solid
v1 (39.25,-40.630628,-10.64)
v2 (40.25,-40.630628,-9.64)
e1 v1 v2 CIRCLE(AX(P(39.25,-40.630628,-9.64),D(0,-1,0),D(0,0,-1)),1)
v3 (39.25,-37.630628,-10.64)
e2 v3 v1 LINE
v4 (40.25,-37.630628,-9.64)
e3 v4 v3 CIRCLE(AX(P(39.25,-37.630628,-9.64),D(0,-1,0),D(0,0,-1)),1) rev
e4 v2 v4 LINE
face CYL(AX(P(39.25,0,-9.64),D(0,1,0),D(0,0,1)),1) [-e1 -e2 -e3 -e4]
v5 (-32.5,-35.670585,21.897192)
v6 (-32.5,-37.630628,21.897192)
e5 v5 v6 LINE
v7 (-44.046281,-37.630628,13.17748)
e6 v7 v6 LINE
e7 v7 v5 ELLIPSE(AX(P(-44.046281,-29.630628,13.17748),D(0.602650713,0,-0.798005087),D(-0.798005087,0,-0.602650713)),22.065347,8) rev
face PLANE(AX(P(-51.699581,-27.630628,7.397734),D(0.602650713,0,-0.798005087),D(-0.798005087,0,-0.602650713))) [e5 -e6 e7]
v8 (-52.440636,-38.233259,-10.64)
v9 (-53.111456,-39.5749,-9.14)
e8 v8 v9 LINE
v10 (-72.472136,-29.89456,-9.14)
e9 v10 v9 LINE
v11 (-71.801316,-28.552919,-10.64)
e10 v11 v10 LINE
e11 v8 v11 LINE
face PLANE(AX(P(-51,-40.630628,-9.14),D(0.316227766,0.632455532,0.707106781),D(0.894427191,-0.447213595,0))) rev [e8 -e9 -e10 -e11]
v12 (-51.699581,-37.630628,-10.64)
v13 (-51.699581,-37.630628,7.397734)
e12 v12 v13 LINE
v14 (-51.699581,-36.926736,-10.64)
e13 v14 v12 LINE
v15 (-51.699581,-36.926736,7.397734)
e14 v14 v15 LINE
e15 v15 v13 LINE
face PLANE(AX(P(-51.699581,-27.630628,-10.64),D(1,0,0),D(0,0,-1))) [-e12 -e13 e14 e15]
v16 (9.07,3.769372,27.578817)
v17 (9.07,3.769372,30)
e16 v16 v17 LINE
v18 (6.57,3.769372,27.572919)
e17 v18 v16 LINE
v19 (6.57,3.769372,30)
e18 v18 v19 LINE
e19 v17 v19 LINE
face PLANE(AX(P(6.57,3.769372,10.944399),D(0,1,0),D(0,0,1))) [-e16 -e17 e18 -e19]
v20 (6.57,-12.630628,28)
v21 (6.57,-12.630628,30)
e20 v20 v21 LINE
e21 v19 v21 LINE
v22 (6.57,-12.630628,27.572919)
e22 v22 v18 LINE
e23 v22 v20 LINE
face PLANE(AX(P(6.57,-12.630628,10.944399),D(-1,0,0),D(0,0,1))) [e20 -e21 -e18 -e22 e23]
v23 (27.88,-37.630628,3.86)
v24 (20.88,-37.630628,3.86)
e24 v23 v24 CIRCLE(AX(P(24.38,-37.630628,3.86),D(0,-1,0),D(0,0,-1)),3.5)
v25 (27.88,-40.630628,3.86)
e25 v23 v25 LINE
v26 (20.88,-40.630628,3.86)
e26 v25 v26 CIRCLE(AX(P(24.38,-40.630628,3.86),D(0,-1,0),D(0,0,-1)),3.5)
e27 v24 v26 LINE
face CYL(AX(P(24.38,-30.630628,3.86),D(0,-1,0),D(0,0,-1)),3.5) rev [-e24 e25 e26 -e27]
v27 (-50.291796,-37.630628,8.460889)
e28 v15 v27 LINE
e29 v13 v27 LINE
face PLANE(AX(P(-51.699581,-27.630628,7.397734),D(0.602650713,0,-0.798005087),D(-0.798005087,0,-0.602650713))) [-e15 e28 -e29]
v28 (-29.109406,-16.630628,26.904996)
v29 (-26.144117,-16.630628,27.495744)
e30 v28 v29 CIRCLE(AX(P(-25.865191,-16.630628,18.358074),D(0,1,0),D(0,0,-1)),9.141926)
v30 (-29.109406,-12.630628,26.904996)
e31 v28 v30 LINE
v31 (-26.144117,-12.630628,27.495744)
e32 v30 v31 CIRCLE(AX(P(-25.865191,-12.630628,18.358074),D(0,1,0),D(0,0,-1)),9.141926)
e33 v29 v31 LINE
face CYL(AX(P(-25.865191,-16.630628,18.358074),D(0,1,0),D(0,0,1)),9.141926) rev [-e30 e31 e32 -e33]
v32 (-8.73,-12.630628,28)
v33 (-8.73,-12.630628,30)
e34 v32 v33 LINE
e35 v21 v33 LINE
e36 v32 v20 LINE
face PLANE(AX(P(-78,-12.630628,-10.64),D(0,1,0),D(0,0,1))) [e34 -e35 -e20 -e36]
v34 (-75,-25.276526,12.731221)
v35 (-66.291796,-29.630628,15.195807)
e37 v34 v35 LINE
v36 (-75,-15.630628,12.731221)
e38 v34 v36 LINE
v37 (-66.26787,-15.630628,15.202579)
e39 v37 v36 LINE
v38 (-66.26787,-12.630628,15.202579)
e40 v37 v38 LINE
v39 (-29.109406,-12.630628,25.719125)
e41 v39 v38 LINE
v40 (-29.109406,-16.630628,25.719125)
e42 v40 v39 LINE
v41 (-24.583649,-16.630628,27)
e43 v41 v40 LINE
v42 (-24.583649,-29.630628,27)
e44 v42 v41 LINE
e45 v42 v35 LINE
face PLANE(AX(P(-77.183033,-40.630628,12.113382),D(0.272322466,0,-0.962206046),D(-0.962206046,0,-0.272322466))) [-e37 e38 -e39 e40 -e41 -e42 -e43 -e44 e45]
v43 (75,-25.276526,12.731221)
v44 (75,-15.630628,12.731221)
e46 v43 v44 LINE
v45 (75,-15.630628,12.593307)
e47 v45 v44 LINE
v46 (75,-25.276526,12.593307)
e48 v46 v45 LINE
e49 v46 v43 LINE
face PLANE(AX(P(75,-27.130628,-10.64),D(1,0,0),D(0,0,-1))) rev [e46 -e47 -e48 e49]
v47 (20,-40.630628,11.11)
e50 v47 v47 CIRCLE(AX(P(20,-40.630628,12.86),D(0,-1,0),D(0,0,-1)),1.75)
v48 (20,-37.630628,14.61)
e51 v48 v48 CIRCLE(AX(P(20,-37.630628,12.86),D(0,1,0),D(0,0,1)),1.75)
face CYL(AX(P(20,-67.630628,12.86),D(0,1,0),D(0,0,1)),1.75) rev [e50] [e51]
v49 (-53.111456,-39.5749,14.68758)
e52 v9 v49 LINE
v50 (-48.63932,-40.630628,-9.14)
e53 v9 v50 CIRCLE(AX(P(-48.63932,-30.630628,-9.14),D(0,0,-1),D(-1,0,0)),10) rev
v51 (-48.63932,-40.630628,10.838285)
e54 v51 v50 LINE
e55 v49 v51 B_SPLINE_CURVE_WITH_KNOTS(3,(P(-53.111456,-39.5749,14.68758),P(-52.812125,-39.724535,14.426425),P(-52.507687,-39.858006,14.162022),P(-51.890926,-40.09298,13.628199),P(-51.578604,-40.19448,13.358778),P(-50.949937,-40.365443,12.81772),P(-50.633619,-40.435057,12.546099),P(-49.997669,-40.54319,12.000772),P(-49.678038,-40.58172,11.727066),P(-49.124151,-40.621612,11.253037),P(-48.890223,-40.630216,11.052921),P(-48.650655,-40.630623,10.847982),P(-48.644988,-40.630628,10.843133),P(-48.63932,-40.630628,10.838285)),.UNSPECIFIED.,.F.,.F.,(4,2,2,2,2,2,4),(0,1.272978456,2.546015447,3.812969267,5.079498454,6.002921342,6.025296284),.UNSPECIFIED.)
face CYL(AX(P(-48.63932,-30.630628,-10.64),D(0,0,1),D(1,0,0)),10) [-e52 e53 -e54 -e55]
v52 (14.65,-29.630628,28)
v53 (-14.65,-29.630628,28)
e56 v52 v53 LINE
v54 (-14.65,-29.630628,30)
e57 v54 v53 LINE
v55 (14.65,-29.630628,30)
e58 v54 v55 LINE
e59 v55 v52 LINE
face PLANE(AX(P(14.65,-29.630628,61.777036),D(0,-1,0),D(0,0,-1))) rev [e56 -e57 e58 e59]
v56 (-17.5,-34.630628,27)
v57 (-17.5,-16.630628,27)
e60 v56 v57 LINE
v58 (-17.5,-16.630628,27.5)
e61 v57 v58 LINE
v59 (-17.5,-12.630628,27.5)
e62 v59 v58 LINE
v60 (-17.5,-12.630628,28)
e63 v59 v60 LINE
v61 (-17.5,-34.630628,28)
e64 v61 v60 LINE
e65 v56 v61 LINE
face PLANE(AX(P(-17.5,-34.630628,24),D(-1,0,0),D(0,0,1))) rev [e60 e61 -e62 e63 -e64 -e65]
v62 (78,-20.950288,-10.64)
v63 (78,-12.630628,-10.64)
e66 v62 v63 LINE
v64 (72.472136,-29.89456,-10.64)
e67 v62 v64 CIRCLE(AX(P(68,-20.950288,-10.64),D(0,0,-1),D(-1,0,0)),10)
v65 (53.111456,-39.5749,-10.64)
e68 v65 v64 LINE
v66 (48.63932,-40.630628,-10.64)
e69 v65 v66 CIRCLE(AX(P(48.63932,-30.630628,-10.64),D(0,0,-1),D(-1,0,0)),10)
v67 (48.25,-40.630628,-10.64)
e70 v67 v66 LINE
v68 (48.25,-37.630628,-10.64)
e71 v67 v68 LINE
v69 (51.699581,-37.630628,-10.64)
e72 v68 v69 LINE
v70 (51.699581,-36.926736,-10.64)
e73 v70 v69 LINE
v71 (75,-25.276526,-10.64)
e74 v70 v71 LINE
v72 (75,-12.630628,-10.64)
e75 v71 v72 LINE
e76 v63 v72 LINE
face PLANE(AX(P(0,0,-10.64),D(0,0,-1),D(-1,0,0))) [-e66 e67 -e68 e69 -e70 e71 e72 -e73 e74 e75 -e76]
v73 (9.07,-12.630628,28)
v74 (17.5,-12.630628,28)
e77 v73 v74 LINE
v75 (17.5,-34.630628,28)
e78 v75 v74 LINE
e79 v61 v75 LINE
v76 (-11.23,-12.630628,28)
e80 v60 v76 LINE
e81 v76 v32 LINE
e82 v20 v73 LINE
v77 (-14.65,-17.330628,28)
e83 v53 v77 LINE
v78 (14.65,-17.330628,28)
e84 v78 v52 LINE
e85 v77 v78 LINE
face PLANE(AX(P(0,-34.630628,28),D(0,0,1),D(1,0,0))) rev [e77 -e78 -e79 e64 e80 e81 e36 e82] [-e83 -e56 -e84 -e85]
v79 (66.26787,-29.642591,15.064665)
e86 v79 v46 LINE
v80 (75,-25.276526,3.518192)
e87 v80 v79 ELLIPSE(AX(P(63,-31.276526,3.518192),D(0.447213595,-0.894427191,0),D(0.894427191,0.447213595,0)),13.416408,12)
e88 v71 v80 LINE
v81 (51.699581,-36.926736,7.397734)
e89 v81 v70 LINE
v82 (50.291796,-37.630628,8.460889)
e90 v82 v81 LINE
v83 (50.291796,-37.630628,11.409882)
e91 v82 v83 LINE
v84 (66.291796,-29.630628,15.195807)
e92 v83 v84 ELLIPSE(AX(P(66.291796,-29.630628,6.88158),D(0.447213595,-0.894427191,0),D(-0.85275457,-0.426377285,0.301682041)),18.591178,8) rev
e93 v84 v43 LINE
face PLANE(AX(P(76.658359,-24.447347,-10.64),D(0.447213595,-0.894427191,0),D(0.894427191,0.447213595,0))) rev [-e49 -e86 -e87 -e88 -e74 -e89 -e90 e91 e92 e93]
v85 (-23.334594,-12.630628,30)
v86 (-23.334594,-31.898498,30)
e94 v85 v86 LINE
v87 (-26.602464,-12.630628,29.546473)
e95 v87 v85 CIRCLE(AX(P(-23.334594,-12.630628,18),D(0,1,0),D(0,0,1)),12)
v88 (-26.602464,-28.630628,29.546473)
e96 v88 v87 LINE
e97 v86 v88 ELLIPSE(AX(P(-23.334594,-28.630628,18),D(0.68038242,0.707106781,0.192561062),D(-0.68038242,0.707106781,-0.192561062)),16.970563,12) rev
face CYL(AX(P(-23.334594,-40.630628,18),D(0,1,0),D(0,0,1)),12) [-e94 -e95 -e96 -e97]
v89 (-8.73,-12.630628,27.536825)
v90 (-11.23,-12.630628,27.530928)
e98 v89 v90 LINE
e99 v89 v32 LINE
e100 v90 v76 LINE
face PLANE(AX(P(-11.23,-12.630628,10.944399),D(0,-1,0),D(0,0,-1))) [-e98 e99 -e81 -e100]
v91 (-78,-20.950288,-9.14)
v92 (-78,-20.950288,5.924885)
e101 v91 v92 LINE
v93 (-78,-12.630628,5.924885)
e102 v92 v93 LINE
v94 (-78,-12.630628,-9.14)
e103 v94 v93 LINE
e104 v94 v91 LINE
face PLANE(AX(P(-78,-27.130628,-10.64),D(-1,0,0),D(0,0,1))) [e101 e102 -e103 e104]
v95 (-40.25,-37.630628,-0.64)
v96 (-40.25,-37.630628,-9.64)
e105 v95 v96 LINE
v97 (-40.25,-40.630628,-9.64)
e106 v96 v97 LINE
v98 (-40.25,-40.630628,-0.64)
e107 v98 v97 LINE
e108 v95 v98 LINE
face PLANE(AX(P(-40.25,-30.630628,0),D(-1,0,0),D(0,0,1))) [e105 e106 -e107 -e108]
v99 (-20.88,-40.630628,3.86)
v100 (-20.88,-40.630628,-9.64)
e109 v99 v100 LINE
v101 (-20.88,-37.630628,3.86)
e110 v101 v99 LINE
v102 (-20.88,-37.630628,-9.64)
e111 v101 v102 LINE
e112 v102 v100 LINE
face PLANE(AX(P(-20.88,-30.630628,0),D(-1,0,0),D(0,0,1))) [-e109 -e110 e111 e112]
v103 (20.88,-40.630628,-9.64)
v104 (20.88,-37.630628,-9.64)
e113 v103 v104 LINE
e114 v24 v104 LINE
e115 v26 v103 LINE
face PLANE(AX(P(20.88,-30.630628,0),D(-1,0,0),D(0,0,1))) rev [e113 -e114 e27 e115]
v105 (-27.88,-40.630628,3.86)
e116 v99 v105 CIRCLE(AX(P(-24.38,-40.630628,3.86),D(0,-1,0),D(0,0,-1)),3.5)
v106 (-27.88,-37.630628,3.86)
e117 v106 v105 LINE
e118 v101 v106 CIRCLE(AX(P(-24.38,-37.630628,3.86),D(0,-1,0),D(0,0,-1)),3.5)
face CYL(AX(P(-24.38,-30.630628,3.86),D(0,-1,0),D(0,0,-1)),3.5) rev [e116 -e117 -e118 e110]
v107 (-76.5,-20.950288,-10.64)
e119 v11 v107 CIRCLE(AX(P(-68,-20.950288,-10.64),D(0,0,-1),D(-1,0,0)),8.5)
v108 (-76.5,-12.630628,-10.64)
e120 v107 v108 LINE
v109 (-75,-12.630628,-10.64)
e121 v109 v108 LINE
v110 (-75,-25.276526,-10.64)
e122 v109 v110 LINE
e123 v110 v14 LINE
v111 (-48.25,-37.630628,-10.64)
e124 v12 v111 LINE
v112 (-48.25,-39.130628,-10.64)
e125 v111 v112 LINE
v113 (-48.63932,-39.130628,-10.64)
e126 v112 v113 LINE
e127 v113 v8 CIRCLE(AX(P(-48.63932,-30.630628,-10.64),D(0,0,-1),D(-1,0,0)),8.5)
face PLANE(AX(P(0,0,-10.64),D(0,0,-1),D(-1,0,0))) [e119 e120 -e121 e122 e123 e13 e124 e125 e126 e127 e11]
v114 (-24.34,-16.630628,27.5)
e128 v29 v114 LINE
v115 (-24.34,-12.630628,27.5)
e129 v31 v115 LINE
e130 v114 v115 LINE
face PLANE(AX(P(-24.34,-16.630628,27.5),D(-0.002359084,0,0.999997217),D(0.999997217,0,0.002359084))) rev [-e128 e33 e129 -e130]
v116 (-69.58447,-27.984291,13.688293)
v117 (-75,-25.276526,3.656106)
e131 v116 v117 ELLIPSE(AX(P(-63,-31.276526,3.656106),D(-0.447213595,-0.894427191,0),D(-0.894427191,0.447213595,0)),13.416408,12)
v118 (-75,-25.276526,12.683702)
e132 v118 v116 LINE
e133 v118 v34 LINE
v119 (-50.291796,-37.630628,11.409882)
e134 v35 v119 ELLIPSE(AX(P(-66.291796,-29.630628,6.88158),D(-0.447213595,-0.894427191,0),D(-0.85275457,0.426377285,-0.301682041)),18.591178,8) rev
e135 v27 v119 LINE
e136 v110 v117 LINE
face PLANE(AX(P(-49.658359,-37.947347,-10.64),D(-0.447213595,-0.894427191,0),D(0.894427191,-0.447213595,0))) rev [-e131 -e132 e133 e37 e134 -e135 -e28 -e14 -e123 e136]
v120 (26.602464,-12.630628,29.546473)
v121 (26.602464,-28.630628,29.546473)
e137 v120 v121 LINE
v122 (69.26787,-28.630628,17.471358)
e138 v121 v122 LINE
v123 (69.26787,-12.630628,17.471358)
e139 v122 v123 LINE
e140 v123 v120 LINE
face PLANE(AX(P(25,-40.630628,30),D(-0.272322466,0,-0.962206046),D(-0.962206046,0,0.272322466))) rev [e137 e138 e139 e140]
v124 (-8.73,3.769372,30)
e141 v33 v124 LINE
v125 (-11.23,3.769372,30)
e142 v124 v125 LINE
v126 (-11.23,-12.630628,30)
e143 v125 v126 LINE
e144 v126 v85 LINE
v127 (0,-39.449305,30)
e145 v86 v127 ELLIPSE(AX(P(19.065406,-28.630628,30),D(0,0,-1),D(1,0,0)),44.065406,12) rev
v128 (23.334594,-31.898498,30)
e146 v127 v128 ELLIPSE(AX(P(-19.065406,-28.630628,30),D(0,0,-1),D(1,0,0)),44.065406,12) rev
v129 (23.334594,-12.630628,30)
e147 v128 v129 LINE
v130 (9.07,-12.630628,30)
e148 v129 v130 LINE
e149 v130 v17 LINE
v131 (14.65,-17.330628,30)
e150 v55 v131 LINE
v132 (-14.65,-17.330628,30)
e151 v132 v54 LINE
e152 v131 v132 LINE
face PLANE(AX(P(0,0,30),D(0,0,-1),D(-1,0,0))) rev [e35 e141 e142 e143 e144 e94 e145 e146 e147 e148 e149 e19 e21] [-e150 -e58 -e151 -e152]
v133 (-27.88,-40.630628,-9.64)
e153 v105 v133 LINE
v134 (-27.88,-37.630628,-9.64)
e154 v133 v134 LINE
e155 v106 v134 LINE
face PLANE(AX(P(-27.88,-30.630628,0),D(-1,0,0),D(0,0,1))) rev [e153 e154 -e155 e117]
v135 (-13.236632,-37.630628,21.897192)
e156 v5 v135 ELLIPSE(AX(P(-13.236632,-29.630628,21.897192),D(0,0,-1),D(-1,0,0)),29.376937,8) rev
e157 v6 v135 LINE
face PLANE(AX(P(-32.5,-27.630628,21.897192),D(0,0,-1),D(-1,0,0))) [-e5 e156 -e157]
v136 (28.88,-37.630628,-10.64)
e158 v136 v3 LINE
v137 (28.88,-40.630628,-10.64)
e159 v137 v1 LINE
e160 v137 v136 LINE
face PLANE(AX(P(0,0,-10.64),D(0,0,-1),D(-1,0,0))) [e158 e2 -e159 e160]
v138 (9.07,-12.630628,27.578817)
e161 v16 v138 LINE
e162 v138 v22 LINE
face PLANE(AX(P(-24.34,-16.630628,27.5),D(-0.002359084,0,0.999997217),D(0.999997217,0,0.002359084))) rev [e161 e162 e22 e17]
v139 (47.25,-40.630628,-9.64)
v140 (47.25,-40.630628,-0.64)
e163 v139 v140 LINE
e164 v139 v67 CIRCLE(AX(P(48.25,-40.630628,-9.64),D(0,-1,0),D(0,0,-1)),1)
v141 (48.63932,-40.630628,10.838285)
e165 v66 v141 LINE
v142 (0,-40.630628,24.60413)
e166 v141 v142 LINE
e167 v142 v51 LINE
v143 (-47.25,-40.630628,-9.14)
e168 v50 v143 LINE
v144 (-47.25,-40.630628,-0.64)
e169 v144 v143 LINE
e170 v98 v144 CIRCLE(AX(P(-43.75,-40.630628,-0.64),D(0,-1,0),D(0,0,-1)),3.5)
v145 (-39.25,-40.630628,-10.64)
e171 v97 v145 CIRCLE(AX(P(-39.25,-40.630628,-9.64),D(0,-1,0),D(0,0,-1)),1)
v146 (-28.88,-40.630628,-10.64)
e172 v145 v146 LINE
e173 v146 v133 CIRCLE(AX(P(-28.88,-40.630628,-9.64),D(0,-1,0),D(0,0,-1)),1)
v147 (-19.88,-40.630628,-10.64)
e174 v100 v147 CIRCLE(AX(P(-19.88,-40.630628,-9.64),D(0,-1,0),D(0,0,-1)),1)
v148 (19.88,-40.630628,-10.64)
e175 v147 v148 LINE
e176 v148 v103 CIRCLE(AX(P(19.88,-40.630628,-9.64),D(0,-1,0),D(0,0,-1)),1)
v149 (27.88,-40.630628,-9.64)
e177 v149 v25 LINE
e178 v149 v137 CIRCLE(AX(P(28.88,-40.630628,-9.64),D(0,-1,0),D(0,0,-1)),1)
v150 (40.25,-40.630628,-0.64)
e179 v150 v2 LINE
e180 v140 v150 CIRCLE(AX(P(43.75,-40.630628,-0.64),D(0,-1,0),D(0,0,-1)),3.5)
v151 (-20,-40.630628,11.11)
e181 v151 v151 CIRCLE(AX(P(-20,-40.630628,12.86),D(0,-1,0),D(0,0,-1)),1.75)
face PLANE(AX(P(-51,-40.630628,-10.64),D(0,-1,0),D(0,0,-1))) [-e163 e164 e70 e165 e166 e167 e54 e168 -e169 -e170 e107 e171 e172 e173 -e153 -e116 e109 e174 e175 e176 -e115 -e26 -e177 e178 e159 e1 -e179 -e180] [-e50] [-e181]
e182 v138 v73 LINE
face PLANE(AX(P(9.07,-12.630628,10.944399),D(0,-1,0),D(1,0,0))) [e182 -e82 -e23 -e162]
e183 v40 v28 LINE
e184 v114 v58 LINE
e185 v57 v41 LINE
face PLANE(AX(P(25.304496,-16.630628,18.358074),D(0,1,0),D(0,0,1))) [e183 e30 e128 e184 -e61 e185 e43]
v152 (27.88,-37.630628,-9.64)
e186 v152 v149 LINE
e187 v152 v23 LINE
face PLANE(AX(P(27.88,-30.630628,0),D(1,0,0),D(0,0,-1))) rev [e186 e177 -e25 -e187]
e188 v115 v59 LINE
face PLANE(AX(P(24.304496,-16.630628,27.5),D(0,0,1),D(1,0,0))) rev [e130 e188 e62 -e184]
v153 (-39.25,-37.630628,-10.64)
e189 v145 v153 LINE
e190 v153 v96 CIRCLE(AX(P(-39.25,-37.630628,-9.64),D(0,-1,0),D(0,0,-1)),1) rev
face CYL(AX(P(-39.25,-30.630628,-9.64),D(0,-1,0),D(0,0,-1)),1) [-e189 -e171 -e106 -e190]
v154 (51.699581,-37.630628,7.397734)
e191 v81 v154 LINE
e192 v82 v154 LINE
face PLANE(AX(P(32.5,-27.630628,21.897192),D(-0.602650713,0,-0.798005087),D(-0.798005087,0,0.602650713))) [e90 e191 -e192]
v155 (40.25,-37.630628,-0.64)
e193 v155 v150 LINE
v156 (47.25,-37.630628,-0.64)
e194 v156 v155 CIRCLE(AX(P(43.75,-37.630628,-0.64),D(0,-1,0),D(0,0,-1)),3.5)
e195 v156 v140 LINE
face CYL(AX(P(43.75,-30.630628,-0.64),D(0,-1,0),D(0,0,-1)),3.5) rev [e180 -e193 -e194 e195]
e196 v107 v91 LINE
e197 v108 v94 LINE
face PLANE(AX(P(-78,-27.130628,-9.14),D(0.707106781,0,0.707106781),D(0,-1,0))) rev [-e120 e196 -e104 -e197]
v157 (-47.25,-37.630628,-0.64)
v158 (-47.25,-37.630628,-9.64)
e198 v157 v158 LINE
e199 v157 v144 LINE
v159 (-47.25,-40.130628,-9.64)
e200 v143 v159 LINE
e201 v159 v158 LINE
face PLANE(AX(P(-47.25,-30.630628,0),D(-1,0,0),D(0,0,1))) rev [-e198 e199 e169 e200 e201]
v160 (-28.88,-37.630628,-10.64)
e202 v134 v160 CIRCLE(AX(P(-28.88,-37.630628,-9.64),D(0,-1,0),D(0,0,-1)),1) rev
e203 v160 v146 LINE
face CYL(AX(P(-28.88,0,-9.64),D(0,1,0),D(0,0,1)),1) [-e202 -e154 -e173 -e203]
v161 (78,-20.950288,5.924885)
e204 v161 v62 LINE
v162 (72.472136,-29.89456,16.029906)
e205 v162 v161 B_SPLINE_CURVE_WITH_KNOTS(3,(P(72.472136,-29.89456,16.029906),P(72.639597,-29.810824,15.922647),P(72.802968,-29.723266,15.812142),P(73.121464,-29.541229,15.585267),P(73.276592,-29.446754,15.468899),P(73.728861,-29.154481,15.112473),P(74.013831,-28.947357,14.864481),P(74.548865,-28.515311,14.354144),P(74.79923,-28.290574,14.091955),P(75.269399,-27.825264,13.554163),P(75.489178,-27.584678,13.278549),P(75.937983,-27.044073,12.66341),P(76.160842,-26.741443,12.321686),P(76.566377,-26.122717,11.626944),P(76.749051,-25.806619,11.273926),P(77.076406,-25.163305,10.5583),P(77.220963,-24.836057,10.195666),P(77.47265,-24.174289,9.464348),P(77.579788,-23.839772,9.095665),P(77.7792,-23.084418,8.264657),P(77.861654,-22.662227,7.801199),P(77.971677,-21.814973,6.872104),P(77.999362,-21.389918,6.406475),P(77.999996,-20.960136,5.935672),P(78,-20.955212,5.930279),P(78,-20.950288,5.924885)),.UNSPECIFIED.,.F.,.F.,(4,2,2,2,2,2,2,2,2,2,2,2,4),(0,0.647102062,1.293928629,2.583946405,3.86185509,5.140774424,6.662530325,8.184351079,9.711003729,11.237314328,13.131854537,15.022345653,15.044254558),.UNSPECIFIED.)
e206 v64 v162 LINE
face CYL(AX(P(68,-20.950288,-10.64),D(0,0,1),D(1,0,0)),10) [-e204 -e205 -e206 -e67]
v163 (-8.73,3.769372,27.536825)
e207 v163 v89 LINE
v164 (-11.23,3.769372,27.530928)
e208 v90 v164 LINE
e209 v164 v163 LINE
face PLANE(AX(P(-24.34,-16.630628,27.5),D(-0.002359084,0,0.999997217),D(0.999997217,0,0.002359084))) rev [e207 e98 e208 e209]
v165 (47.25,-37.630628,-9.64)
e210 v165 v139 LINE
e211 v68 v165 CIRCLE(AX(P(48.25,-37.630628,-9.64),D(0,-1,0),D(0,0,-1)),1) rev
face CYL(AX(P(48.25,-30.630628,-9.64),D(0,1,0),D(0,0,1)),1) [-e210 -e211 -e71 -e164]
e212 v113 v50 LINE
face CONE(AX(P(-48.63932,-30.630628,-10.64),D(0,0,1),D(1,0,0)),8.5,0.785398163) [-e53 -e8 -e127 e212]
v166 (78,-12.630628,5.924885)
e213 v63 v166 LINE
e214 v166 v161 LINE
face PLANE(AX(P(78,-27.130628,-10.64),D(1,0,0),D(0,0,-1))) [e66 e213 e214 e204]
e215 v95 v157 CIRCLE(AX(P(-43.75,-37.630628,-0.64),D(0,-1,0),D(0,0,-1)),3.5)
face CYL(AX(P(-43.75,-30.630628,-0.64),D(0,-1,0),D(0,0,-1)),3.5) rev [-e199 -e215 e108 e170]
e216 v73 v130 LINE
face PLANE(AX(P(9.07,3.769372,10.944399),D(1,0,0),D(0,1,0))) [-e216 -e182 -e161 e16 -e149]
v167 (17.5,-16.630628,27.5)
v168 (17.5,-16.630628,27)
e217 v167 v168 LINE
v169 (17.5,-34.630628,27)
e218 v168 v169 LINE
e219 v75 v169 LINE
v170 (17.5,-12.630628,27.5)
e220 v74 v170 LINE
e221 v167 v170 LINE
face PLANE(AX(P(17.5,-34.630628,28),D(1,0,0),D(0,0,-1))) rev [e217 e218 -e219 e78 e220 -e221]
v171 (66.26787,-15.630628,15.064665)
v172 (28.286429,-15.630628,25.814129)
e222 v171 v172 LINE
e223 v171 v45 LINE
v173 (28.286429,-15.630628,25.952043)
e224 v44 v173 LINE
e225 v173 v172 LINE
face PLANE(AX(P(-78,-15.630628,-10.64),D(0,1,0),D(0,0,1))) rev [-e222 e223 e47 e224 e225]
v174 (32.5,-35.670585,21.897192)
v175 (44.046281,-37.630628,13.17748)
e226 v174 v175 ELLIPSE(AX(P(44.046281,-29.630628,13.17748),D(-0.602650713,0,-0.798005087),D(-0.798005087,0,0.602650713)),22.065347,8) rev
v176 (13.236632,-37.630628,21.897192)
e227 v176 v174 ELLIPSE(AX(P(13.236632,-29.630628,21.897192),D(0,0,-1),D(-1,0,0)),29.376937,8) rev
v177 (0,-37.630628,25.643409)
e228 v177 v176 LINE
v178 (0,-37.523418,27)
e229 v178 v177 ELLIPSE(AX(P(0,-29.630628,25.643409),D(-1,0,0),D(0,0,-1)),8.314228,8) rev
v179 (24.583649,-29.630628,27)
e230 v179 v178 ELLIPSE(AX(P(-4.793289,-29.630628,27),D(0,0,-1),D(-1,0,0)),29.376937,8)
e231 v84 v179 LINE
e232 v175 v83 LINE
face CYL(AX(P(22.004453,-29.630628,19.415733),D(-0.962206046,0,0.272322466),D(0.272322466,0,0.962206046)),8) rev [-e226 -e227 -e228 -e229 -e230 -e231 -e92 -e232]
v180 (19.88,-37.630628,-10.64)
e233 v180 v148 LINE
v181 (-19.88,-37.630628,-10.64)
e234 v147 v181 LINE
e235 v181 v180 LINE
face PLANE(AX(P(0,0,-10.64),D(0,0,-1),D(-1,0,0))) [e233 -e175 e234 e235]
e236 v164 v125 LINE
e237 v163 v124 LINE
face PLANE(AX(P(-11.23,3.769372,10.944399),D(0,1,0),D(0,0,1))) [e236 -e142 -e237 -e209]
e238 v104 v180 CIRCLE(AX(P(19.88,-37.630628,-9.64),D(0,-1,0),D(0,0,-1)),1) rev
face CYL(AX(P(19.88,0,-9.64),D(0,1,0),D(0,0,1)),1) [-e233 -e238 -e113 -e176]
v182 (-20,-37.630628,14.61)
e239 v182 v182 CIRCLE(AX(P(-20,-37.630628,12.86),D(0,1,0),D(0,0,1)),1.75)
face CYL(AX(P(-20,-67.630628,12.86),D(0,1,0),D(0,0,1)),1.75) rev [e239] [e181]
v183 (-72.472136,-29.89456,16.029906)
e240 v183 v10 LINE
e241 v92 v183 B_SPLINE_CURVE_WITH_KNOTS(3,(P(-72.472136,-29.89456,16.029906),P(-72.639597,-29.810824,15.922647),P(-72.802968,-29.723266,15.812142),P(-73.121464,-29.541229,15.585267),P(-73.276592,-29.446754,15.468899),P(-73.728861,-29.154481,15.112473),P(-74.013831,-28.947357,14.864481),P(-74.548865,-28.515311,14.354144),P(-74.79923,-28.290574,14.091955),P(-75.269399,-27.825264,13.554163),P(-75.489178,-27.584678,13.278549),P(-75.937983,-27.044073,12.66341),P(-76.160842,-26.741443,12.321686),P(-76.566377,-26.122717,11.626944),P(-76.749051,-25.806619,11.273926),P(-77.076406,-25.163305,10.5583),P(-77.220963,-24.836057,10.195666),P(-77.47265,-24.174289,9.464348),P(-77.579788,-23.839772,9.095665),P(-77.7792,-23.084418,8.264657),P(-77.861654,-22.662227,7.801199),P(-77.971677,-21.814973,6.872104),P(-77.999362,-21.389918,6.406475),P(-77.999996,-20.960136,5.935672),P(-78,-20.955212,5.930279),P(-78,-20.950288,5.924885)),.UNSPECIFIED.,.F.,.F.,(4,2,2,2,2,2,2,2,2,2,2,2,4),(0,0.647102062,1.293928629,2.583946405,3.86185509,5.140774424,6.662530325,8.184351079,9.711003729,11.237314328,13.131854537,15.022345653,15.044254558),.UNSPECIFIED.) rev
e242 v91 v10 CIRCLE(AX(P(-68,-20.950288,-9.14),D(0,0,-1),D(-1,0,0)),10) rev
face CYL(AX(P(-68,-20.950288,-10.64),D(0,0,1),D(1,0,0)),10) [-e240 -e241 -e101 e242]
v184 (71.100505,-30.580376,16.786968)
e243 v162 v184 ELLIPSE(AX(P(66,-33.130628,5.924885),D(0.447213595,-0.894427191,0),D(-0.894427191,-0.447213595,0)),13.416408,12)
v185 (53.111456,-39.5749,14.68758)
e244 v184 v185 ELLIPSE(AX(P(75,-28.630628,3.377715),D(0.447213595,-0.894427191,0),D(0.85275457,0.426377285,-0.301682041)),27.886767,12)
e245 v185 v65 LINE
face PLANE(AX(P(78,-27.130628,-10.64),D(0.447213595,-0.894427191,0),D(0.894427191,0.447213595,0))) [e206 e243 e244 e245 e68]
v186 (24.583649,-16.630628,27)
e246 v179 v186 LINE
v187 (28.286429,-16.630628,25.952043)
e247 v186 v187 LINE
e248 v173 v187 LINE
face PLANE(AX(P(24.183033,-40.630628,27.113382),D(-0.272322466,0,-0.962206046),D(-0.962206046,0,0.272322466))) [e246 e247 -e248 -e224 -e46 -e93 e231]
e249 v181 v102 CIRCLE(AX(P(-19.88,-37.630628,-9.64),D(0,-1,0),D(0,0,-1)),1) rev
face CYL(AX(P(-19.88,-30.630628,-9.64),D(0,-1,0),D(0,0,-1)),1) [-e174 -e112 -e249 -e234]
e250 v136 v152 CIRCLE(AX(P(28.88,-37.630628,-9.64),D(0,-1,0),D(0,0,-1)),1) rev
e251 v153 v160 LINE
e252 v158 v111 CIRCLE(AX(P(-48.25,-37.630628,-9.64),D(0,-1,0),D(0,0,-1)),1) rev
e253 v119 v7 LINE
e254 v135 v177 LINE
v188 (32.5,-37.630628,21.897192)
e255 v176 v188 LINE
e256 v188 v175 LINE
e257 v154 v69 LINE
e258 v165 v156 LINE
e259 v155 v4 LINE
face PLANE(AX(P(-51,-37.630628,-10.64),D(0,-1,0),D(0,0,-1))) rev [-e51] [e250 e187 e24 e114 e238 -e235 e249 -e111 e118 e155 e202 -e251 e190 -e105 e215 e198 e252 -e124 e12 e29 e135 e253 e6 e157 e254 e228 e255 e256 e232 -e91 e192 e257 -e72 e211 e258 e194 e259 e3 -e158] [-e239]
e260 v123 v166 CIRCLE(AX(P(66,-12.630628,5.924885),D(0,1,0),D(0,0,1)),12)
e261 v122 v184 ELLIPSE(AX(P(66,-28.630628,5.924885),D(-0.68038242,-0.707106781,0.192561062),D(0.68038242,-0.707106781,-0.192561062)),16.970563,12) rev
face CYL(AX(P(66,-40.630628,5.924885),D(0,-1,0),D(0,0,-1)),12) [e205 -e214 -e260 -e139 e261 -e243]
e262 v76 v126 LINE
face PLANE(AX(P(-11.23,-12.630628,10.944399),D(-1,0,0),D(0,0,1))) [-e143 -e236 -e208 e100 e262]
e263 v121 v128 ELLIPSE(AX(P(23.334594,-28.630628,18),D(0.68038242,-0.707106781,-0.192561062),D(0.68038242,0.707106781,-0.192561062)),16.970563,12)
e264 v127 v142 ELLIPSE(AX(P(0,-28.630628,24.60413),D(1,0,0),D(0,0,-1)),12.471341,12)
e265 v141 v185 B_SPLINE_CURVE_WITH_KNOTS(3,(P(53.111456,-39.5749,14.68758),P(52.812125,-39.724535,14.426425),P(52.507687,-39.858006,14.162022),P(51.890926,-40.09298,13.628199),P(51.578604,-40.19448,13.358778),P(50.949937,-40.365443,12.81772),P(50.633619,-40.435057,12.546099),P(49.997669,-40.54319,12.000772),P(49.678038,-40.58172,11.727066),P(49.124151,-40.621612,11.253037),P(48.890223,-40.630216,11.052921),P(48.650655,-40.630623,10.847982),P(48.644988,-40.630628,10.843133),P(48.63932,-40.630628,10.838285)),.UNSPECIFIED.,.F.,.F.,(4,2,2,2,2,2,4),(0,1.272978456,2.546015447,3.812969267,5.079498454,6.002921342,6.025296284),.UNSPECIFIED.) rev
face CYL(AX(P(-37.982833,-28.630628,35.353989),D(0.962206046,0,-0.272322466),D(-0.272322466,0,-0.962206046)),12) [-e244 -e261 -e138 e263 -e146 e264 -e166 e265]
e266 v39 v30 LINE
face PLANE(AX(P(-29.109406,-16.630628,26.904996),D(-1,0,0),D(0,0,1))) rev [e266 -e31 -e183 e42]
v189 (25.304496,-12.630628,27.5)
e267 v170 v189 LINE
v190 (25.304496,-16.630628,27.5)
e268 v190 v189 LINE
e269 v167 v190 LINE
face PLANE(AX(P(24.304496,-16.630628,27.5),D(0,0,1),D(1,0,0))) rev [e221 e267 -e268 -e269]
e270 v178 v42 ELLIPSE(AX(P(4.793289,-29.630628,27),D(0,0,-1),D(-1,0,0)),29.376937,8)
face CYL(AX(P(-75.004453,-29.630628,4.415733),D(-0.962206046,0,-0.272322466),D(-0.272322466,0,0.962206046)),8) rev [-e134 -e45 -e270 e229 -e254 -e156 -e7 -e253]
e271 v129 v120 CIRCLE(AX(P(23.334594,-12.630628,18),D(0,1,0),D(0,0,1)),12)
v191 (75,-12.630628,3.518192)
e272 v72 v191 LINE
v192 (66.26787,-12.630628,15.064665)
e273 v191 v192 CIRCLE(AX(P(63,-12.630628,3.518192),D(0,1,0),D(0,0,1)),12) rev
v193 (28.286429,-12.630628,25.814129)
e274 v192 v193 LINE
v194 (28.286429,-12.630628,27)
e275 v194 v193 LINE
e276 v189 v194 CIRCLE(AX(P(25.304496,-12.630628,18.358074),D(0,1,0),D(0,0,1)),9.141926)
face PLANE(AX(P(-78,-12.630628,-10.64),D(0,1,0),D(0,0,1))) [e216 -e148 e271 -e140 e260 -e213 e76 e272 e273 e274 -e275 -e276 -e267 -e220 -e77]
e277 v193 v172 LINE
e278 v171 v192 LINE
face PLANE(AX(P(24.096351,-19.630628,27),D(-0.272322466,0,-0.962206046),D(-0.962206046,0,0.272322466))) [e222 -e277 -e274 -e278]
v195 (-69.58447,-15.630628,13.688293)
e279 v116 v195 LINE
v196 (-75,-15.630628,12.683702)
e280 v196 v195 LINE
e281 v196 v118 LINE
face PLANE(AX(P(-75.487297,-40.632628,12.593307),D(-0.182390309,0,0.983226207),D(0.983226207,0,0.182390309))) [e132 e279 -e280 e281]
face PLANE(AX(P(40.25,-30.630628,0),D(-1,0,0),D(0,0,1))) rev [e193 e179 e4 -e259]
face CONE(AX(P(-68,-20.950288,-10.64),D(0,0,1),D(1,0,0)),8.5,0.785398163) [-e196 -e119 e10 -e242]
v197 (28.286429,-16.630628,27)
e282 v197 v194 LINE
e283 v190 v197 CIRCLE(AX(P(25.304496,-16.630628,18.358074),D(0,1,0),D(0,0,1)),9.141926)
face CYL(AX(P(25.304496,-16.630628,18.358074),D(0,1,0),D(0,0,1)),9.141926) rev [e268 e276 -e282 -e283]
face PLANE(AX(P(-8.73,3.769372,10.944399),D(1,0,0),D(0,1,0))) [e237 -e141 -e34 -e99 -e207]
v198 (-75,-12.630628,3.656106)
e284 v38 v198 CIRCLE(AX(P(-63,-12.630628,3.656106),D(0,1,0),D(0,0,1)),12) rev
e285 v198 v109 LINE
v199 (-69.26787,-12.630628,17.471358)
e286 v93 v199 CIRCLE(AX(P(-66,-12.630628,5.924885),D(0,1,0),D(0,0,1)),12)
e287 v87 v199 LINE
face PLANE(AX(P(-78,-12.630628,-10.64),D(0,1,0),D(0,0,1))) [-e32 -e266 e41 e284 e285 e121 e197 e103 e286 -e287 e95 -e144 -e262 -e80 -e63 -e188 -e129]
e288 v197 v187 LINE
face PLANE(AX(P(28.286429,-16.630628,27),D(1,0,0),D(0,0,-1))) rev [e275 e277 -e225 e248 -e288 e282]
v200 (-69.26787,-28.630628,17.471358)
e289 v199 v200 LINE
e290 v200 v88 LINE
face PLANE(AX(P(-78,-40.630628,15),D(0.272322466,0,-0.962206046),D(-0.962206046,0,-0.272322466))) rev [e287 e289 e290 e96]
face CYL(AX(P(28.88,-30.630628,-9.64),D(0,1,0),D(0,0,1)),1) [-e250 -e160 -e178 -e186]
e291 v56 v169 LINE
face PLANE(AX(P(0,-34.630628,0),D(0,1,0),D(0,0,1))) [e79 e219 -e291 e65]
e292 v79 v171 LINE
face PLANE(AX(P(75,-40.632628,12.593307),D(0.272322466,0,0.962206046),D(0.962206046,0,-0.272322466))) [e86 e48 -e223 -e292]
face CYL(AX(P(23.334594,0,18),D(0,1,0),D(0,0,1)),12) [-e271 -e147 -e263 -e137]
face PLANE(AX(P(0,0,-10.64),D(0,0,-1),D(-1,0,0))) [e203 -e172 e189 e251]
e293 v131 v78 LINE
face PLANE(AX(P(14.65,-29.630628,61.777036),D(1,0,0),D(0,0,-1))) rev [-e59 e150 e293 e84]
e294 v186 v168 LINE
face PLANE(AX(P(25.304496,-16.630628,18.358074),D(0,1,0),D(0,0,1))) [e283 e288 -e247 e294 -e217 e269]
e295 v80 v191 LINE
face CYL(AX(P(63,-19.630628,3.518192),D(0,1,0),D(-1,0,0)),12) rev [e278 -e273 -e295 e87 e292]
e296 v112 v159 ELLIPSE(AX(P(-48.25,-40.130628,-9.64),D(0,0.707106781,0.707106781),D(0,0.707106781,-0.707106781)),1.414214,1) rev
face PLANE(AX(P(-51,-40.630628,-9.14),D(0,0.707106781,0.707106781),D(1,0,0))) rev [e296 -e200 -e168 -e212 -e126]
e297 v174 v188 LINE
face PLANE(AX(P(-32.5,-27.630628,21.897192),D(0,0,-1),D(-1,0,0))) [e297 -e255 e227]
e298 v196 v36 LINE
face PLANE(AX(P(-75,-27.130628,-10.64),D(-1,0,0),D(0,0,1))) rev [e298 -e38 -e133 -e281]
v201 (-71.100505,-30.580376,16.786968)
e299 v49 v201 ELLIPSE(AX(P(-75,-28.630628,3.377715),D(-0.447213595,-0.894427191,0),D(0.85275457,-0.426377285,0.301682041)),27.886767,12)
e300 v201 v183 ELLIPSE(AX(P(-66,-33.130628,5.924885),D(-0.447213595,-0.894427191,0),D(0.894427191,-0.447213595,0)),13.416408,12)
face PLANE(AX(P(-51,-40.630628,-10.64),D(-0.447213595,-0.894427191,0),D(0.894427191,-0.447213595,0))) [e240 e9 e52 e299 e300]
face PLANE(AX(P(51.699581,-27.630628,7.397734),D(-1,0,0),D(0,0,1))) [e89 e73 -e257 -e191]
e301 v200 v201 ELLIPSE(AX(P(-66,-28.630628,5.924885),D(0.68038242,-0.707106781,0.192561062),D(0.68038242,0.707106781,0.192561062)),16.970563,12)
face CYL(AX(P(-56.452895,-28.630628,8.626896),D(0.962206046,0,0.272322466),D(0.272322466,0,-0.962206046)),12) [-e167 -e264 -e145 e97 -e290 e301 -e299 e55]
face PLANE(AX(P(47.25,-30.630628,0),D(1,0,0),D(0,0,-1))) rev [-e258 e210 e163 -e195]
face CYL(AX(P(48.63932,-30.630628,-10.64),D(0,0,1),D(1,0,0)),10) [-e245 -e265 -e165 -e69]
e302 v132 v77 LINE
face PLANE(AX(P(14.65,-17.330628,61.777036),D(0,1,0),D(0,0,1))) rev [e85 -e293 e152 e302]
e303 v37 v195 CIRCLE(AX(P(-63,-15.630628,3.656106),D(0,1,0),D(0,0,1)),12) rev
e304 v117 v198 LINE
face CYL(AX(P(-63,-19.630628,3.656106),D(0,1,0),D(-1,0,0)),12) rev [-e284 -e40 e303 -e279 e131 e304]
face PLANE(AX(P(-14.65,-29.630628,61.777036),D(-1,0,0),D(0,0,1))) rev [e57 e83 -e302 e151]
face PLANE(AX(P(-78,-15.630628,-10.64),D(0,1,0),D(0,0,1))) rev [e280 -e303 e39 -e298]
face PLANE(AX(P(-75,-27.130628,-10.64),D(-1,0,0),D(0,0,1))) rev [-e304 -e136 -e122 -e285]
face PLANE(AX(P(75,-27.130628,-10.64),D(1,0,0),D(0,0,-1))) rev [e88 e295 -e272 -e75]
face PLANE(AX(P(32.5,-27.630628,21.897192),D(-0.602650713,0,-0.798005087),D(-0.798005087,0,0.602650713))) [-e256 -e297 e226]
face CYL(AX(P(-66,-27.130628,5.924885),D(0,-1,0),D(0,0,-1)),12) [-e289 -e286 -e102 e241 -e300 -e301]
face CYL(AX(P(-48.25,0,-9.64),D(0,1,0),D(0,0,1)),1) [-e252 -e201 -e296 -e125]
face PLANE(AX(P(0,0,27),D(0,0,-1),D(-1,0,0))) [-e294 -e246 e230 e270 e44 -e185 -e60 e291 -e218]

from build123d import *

# Parameters (mm, degrees)
BOSS_EXTRUDE1_DEPTH      = 30
BOSS_EXTRUDE1_DEPTH_BACK = 10.64
CUT_EXTRUDE1_DEPTH       = 89.136258146
SHELL1_T                 = -3
CUT_EXTRUDE4_DEPTH       = 4
CUT_EXTRUDE4_DEPTH_BACK  = 10
FILLET3_R                = 8
FILLET1_R                = 12
SKETCH4_R                = 1.75
CUT_EXTRUDE2_DEPTH       = 30
BOSS_EXTRUDE5_REACH      = 89.23
CUT_EXTRUDE5_DEPTH       = 4
SKETCH12_W               = 29.3
SKETCH12_H               = 12.3
CUT_EXTRUDE6_DEPTH       = 3
CUT_EXTRUDE7_DEPTH       = 22
FILLET2_START            = -12
FILLET2_DEPTH            = 29.471357663
BOSS_EXTRUDE4_REACH      = 98.884
SKETCH14_W               = 2.5
SKETCH14_H               = 16.4
SKETCH18_R               = 3.5
CUT_EXTRUDE11_DEPTH      = 10
CUT_EXTRUDE12_DEPTH      = 10
CHAMFER1_SIZE            = 1.5
FILLET5_R                = 1


with BuildPart() as part:
    # Sketch1 → Boss-Extrude1 (new, two sides: drawn at the far end of the back side and taken through both)
    with BuildSketch(Plane.XY.offset(-BOSS_EXTRUDE1_DEPTH_BACK)):
        Polygon((-51, -40.630628171), (51, -40.630628171), (78, -27.130628171), (78, -12.630628171), (-78, -12.630628171), (-78, -27.130628171), align=None)
    extrude(amount=BOSS_EXTRUDE1_DEPTH + BOSS_EXTRUDE1_DEPTH_BACK)

    # Sketch2 → Cut-Extrude1 (cut, through all)
    with BuildSketch(Plane(origin=(0, -12.630628171, 0), x_dir=(1, 0, 0), z_dir=(0, 1, 0))):
        Polygon((-78, -15), (-25, -30), (25, -30), (78, -15), (78, -44.649515781), (-78, -44.649515781), align=None)
    extrude(amount=-CUT_EXTRUDE1_DEPTH, mode=Mode.SUBTRACT)

    # Shell1
    shell1_openings = [part.faces().sort_by_distance(p)[0] for p in [
        (0, -25.765697486, -10.64),
    ]]
    offset(amount=SHELL1_T, openings=shell1_openings, kind=Kind.INTERSECTION)

    # Sketch7 → Cut-Extrude4 (cut, two sides: drawn at the far end of the back side and taken through both)
    with BuildSketch(Plane.XZ.offset(15.630628171).offset(-CUT_EXTRUDE4_DEPTH_BACK)):
        with BuildLine():
            Line((-24.583648517, 27), (24.096351483, 27))
            Line((24.096351483, 27), (66.26786959, 15.064664687))
            ThreePointArc((66.26786959, 15.064664687), (72.571165945, 10.756478016), (75, 3.518192137))
            Line((75, 3.518192137), (75, -10.64))
            Line((75, -10.64), (-75, -10.64))
            Line((-75, -10.64), (-75, 3.656106392))
            ThreePointArc((-75, 3.656106392), (-72.571165945, 10.894392271), (-66.26786959, 15.202578942))
            Line((-66.26786959, 15.202578942), (-24.583648517, 27))
        make_face()
    extrude(amount=CUT_EXTRUDE4_DEPTH + CUT_EXTRUDE4_DEPTH_BACK, mode=Mode.SUBTRACT)

    # Fillet3
    # the kernel refuses this fillet: 8 mm, written as the material it adds along each edge
    with BuildSketch(Plane(origin=(-69.535916984, -37.630628171, 14.277659868), x_dir=(0.27232246579934893, 0, -0.9622060458243663), z_dir=(0.9622060458243663, 0, 0.27232246579934893))) as fillet3_piece_1_section:
        with BuildLine():
            CenterArc((FILLET3_R, FILLET3_R), FILLET3_R, 180, 90)
            Line((0, FILLET3_R), (0, 0))
            Line((0, 0), (FILLET3_R, 0))
        make_face()
    fillet3_piece_1 = extrude(amount=80.717923528, mode=Mode.PRIVATE)
    fillet3_piece_1 = split(fillet3_piece_1, bisect_by=Plane(origin=(-65.687092801, -29.932979805, 14.277659868), z_dir=(0.44721359549995787, 0.894427190999916, 0)), keep=Keep.TOP, mode=Mode.PRIVATE)
    fillet3_piece_1 = split(fillet3_piece_1, bisect_by=Plane(origin=(-69.535916984, -37.630628171, 27), z_dir=(0, 0, -1)), keep=Keep.TOP, mode=Mode.PRIVATE)
    add(fillet3_piece_1)
    with BuildSketch(Plane(origin=(-8.131357041, -37.630628171, 36.258963837), x_dir=(-0.27232246579934893, 0, -0.9622060458243663), z_dir=(0.9622060458243663, 0, -0.27232246579934893))) as fillet3_piece_2_section:
        with BuildLine():
            CenterArc((FILLET3_R, FILLET3_R), FILLET3_R, 180, 90)
            Line((0, FILLET3_R), (0, 0))
            Line((0, 0), (FILLET3_R, 0))
        make_face()
    fillet3_piece_2 = extrude(amount=80.717923528, mode=Mode.PRIVATE)
    fillet3_piece_2 = split(fillet3_piece_2, bisect_by=Plane(origin=(3.553273581, -60.999889415, 36.258963837), z_dir=(-0.44721359549995787, 0.894427190999916, 0)), keep=Keep.TOP, mode=Mode.PRIVATE)
    fillet3_piece_2 = split(fillet3_piece_2, bisect_by=Plane(origin=(-8.131357041, -37.630628171, 27), z_dir=(0, 0, -1)), keep=Keep.TOP, mode=Mode.PRIVATE)
    add(fillet3_piece_2)

    # Fillet1
    # the kernel refuses this fillet: 12 mm, written as the material it takes off along each edge
    with BuildSketch(Plane(origin=(78, 10.057159045, 15), x_dir=(-0.9622060458243663, 0, 0.2723224657993491), z_dir=(0, -1, 0)), Plane(origin=(-78, 10.057159045, 15), x_dir=(0, 0, -1), z_dir=(0, -1, 0))) as fillet1_piece_1:
        with BuildLine():
            CenterArc((FILLET1_R * 0.756259573881, FILLET1_R), FILLET1_R, 195.802513954, 74.197486046)
            Line((-FILLET1_R * 0.205946471944, FILLET1_R * 0.727677534201), (0, 0))
            Line((0, 0), (FILLET1_R * 0.756259573881, 0))
        make_face()
    extrude(amount=59.875574433, mode=Mode.SUBTRACT)
    with BuildSketch(Plane(origin=(25, -8.46711334, 30), x_dir=(0.9622060458243658, 0, -0.27232246579935065), z_dir=(0, -1, 0))) as fillet1_piece_2:
        with BuildLine():
            CenterArc((FILLET1_R * 0.138783827712, -FILLET1_R), FILLET1_R, 90, 15.802513954)
            Line((-FILLET1_R * 0.133538638087, -FILLET1_R * 0.0377939541756), (0, 0))
            Line((0, 0), (FILLET1_R * 0.138783827712, 0))
        make_face()
    extrude(amount=36.327029663, mode=Mode.SUBTRACT)
    with BuildSketch(Plane(origin=(-24.072508337, -40.630628171, 43.888445756), x_dir=(0, 1, 0), z_dir=(0.9622060458243663, 0, -0.27232246579934893)), Plane(origin=(-79.866181375, -40.630628171, 14.47183546), x_dir=(0, 1, 0), z_dir=(0.9622060458243663, 0, 0.27232246579934893))) as fillet1_piece_3:
        with BuildLine():
            CenterArc((FILLET1_R, -FILLET1_R), FILLET1_R, 90, 90)
            Line((0, -FILLET1_R), (0, 0))
            Line((0, 0), (FILLET1_R, 0))
        make_face()
    extrude(amount=108.021239487, mode=Mode.SUBTRACT)
    with BuildSketch(Plane(origin=(-25, -8.46711334, 30), x_dir=(-0.9622060458243663, 0, -0.272322465799349), z_dir=(0, -1, 0))) as fillet1_piece_4:
        with BuildLine():
            CenterArc((FILLET1_R * 0.138783827712, FILLET1_R), FILLET1_R, 254.197486046, 15.802513954)
            Line((-FILLET1_R * 0.133538638087, FILLET1_R * 0.0377939541756), (0, 0))
            Line((0, 0), (FILLET1_R * 0.138783827712, 0))
        make_face()
    extrude(amount=36.327029663, mode=Mode.SUBTRACT)

    # Sketch4 → Cut-Extrude2 (cut)
    with BuildSketch(Plane(origin=(0, -37.630628171, 0), x_dir=(1, 0, 0), z_dir=(0, 1, 0))):
        with Locations(Location((-20, -12.86, 0), (0, 0, 270))):
            Circle(SKETCH4_R)
        with Locations(Location((20, -12.86, 0), (0, 0, 270))):
            Circle(SKETCH4_R)
    extrude(amount=-CUT_EXTRUDE2_DEPTH, mode=Mode.SUBTRACT)

    # Sketch10 → Boss-Extrude5 (add, up to next)
    with BuildSketch(Plane(origin=(0, -15.630628171, 0), x_dir=(1, 0, 0), z_dir=(0, 1, 0)), mode=Mode.PRIVATE) as boss_extrude5_sk1:
        with BuildLine():
            Line((75, -3.518192137), (75, -12.593307024))
            Line((75, -12.593307024), (66.26786959, -15.064664687))
            ThreePointArc((66.26786959, -15.064664687), (72.571165945, -10.756478016), (75, -3.518192137))
        make_face()
    boss_extrude5_tool1 = extrude(boss_extrude5_sk1.sketch, amount=-BOSS_EXTRUDE5_REACH, mode=Mode.PRIVATE) - part.part
    # Sketch10 → Boss-Extrude5 (add, up to next)
    with BuildSketch(Plane(origin=(0, -15.630628171, 0), x_dir=(1, 0, 0), z_dir=(0, 1, 0)), mode=Mode.PRIVATE) as boss_extrude5_sk2:
        with BuildLine():
            Line((-75.487297034, -12.593307024), (-69.584469585, -13.688292608))
            ThreePointArc((-69.584469585, -13.688292608), (-73.559678854, -9.356385551), (-75, -3.656106392))
            Line((-75, -3.656106392), (-75.487297034, -12.593307024))
        make_face()
    boss_extrude5_tool2 = extrude(boss_extrude5_sk2.sketch, amount=-BOSS_EXTRUDE5_REACH, mode=Mode.PRIVATE) - part.part
    add(boss_extrude5_tool1.solids().sort_by_distance((73.119365, -15.630628, 11.171058))[0])
    add(boss_extrude5_tool2.solids().sort_by_distance((-73.752935, -15.630628, 10.714464))[0])

    # Sketch11 → Cut-Extrude5 (cut)
    with BuildSketch(Plane(origin=(0, -12.630628171, 0), x_dir=(1, 0, 0), z_dir=(0, 1, 0))):
        with BuildLine():
            Line((-24.583648517, -27), (24.096351483, -27))
            Line((24.096351483, -27), (28.286429465, -25.814128873))
            Line((28.286429465, -25.814128873), (28.286429465, -27))
            ThreePointArc((28.286429465, -27), (26.816277128, -27.374133532), (25.30449625, -27.5))
            Line((25.30449625, -27.5), (24.30449625, -27.5))
            Line((24.30449625, -27.5), (-24.34, -27.5))
            Line((-24.34, -27.5), (-26.144116779, -27.495743925))
            ThreePointArc((-26.144116779, -27.495743925), (-27.651353583, -27.323810768), (-29.109406457, -26.904996238))
            Line((-29.109406457, -26.904996238), (-29.109406457, -25.719125111))
            Line((-29.109406457, -25.719125111), (-24.583648517, -27))
        make_face()
    extrude(amount=-CUT_EXTRUDE5_DEPTH, mode=Mode.SUBTRACT)

    # Sketch12 → Cut-Extrude6 (cut)
    with BuildSketch(Plane(origin=(0, 0, 27), x_dir=(-1, 0, 0), z_dir=(0, 0, -1))):
        with Locations((0, -23.480628171)):
            Rectangle(SKETCH12_W, SKETCH12_H)
    extrude(amount=-CUT_EXTRUDE6_DEPTH, mode=Mode.SUBTRACT)

    # Sketch13 → Cut-Extrude7 (cut)
    with BuildSketch(Plane(origin=(0, -12.630628171, 0), x_dir=(1, 0, 0), z_dir=(0, 1, 0))):
        Polygon((0, -28), (17.5, -28), (17.5, -24), (-17.5, -24), (-17.5, -28), align=None)
    extrude(amount=-CUT_EXTRUDE7_DEPTH, mode=Mode.SUBTRACT)

    # Fillet2: read off the stored shape, not the designer's step
    # Fillet2 outline → Fillet2 (cut)
    with BuildSketch(Plane.XY.offset(FILLET2_START)):
        with BuildLine():
            ThreePointArc((78, -20.950288284), (76.506508084, -26.207599405), (72.472135955, -29.894560194))
            Line((72.472135955, -29.894560194), (78, -27.130628171))
            Line((78, -27.130628171), (78, -20.950288284))
        make_face()
        with BuildLine():
            ThreePointArc((53.11145618, -39.574900081), (50.936849431, -40.363118066), (48.639320225, -40.630628171))
            Line((48.639320225, -40.630628171), (51, -40.630628171))
            Line((51, -40.630628171), (53.11145618, -39.574900081))
        make_face()
        with BuildLine():
            ThreePointArc((-48.639320225, -40.630628171), (-50.936849431, -40.363118066), (-53.11145618, -39.574900081))
            Line((-53.11145618, -39.574900081), (-51, -40.630628171))
            Line((-51, -40.630628171), (-48.639320225, -40.630628171))
        make_face()
        with BuildLine():
            ThreePointArc((-72.472135955, -29.894560194), (-76.506508084, -26.207599405), (-78, -20.950288284))
            Line((-78, -20.950288284), (-78, -27.130628171))
            Line((-78, -27.130628171), (-72.472135955, -29.894560194))
        make_face()
    extrude(amount=FILLET2_DEPTH, mode=Mode.SUBTRACT)

    # Boss-Extrude4: up to this plane
    boss_extrude4_end = Plane(origin=(-24.34, -16.630628171, 27.5), z_dir=(-0.0023590840693536327, 0, 0.9999972173573053))
    # Sketch14 → Boss-Extrude4 (add, up to the surface)
    with BuildSketch(Plane.XY.offset(30), mode=Mode.PRIVATE) as boss_extrude4_sk1:
        with Locations((-9.98, -4.430628171)):
            Rectangle(SKETCH14_W, SKETCH14_H)
    boss_extrude4_tool1 = split(extrude(boss_extrude4_sk1.sketch, amount=-BOSS_EXTRUDE4_REACH, mode=Mode.PRIVATE), bisect_by=boss_extrude4_end, keep=Keep.BOTH, mode=Mode.PRIVATE)
    add(boss_extrude4_tool1.solids().sort_by_distance((-9.98, -4.430628, 30))[0])
    # Sketch14 → Boss-Extrude4 (add, up to the surface)
    with BuildSketch(Plane.XY.offset(30), mode=Mode.PRIVATE) as boss_extrude4_sk2:
        with Locations((7.82, -4.430628171)):
            Rectangle(SKETCH14_W, SKETCH14_H)
    boss_extrude4_tool2 = split(extrude(boss_extrude4_sk2.sketch, amount=-BOSS_EXTRUDE4_REACH, mode=Mode.PRIVATE), bisect_by=boss_extrude4_end, keep=Keep.BOTH, mode=Mode.PRIVATE)
    add(boss_extrude4_tool2.solids().sort_by_distance((7.82, -4.430628, 30))[0])

    # Sketch18 → Cut-Extrude11 (cut)
    with BuildSketch(Plane.XZ.offset(40.630628171)):
        with BuildLine():
            ThreePointArc((-20.88, 3.86), (-24.38, 0.36), (-27.88, 3.86))
            Line((-27.88, 3.86), (-27.88, -10.64))
            Line((-27.88, -10.64), (-20.88, -10.64))
            Line((-20.88, -10.64), (-20.88, 3.86))
        make_face()
        with Locations((-24.38, 3.86)):
            Circle(SKETCH18_R)
        with Locations((-43.75, -0.64)):
            Circle(SKETCH18_R)
        with BuildLine():
            Line((-47.25, -10.64), (-40.25, -10.64))
            Line((-40.25, -10.64), (-40.25, -0.64))
            ThreePointArc((-40.25, -0.64), (-43.75, -4.14), (-47.25, -0.64))
            Line((-47.25, -0.64), (-47.25, -10.64))
        make_face()
        with BuildLine():
            Line((20.88, 3.86), (20.88, -10.64))
            Line((20.88, -10.64), (27.88, -10.64))
            Line((27.88, -10.64), (27.88, 3.86))
            ThreePointArc((27.88, 3.86), (24.38, 0.36), (20.88, 3.86))
        make_face()
        with Locations((24.38, 3.86)):
            Circle(SKETCH18_R)
        with BuildLine():
            Line((40.25, -0.64), (40.25, -10.64))
            Line((40.25, -10.64), (47.25, -10.64))
            Line((47.25, -10.64), (47.25, -0.64))
            ThreePointArc((47.25, -0.64), (43.75, -4.14), (40.25, -0.64))
        make_face()
        with Locations((43.75, -0.64)):
            Circle(SKETCH18_R)
    extrude(amount=-CUT_EXTRUDE11_DEPTH, mode=Mode.SUBTRACT)

    # Sketch19 → Cut-Extrude12 (cut)
    with BuildSketch(Plane(origin=(0, -37.630628171, 0), x_dir=(1, 0, 0), z_dir=(0, 1, 0))):
        Polygon((51.69958099, -7.397734366), (51.69958099, 10.64), (-51.69958099, 10.64), (-51.69958099, -7.397734366), (-32.5, -21.897192277), (32.5, -21.897192277), align=None)
    extrude(amount=CUT_EXTRUDE12_DEPTH, mode=Mode.SUBTRACT)

    # Chamfer1
    chamfer1_edges = [part.edges().sort_by_distance(p)[0] for p in [
        (-78, -16.790458228, -10.64),
        (-62.791796068, -34.734730138, -10.64),
        (-47.944660113, -40.630628171, -10.64),
        (-50.936849431, -40.363118066, -10.64),
        (-76.506508084, -26.207599405, -10.64),
    ]]
    chamfer(chamfer1_edges, length=CHAMFER1_SIZE)

    # Fillet5
    fillet5_edges = [part.edges().sort_by_distance(p)[0] for p in [
        (47.25, -39.130628171, -10.64),
        (40.25, -39.130628171, -10.64),
        (27.88, -39.130628171, -10.64),
        (20.88, -39.130628171, -10.64),
        (-40.25, -39.130628171, -10.64),
        (-47.25, -38.380628171, -10.64),
        (-20.88, -39.130628171, -10.64),
        (-27.88, -39.130628171, -10.64),
    ]]
    fillet(fillet5_edges, radius=FILLET5_R)


solid = part.part
